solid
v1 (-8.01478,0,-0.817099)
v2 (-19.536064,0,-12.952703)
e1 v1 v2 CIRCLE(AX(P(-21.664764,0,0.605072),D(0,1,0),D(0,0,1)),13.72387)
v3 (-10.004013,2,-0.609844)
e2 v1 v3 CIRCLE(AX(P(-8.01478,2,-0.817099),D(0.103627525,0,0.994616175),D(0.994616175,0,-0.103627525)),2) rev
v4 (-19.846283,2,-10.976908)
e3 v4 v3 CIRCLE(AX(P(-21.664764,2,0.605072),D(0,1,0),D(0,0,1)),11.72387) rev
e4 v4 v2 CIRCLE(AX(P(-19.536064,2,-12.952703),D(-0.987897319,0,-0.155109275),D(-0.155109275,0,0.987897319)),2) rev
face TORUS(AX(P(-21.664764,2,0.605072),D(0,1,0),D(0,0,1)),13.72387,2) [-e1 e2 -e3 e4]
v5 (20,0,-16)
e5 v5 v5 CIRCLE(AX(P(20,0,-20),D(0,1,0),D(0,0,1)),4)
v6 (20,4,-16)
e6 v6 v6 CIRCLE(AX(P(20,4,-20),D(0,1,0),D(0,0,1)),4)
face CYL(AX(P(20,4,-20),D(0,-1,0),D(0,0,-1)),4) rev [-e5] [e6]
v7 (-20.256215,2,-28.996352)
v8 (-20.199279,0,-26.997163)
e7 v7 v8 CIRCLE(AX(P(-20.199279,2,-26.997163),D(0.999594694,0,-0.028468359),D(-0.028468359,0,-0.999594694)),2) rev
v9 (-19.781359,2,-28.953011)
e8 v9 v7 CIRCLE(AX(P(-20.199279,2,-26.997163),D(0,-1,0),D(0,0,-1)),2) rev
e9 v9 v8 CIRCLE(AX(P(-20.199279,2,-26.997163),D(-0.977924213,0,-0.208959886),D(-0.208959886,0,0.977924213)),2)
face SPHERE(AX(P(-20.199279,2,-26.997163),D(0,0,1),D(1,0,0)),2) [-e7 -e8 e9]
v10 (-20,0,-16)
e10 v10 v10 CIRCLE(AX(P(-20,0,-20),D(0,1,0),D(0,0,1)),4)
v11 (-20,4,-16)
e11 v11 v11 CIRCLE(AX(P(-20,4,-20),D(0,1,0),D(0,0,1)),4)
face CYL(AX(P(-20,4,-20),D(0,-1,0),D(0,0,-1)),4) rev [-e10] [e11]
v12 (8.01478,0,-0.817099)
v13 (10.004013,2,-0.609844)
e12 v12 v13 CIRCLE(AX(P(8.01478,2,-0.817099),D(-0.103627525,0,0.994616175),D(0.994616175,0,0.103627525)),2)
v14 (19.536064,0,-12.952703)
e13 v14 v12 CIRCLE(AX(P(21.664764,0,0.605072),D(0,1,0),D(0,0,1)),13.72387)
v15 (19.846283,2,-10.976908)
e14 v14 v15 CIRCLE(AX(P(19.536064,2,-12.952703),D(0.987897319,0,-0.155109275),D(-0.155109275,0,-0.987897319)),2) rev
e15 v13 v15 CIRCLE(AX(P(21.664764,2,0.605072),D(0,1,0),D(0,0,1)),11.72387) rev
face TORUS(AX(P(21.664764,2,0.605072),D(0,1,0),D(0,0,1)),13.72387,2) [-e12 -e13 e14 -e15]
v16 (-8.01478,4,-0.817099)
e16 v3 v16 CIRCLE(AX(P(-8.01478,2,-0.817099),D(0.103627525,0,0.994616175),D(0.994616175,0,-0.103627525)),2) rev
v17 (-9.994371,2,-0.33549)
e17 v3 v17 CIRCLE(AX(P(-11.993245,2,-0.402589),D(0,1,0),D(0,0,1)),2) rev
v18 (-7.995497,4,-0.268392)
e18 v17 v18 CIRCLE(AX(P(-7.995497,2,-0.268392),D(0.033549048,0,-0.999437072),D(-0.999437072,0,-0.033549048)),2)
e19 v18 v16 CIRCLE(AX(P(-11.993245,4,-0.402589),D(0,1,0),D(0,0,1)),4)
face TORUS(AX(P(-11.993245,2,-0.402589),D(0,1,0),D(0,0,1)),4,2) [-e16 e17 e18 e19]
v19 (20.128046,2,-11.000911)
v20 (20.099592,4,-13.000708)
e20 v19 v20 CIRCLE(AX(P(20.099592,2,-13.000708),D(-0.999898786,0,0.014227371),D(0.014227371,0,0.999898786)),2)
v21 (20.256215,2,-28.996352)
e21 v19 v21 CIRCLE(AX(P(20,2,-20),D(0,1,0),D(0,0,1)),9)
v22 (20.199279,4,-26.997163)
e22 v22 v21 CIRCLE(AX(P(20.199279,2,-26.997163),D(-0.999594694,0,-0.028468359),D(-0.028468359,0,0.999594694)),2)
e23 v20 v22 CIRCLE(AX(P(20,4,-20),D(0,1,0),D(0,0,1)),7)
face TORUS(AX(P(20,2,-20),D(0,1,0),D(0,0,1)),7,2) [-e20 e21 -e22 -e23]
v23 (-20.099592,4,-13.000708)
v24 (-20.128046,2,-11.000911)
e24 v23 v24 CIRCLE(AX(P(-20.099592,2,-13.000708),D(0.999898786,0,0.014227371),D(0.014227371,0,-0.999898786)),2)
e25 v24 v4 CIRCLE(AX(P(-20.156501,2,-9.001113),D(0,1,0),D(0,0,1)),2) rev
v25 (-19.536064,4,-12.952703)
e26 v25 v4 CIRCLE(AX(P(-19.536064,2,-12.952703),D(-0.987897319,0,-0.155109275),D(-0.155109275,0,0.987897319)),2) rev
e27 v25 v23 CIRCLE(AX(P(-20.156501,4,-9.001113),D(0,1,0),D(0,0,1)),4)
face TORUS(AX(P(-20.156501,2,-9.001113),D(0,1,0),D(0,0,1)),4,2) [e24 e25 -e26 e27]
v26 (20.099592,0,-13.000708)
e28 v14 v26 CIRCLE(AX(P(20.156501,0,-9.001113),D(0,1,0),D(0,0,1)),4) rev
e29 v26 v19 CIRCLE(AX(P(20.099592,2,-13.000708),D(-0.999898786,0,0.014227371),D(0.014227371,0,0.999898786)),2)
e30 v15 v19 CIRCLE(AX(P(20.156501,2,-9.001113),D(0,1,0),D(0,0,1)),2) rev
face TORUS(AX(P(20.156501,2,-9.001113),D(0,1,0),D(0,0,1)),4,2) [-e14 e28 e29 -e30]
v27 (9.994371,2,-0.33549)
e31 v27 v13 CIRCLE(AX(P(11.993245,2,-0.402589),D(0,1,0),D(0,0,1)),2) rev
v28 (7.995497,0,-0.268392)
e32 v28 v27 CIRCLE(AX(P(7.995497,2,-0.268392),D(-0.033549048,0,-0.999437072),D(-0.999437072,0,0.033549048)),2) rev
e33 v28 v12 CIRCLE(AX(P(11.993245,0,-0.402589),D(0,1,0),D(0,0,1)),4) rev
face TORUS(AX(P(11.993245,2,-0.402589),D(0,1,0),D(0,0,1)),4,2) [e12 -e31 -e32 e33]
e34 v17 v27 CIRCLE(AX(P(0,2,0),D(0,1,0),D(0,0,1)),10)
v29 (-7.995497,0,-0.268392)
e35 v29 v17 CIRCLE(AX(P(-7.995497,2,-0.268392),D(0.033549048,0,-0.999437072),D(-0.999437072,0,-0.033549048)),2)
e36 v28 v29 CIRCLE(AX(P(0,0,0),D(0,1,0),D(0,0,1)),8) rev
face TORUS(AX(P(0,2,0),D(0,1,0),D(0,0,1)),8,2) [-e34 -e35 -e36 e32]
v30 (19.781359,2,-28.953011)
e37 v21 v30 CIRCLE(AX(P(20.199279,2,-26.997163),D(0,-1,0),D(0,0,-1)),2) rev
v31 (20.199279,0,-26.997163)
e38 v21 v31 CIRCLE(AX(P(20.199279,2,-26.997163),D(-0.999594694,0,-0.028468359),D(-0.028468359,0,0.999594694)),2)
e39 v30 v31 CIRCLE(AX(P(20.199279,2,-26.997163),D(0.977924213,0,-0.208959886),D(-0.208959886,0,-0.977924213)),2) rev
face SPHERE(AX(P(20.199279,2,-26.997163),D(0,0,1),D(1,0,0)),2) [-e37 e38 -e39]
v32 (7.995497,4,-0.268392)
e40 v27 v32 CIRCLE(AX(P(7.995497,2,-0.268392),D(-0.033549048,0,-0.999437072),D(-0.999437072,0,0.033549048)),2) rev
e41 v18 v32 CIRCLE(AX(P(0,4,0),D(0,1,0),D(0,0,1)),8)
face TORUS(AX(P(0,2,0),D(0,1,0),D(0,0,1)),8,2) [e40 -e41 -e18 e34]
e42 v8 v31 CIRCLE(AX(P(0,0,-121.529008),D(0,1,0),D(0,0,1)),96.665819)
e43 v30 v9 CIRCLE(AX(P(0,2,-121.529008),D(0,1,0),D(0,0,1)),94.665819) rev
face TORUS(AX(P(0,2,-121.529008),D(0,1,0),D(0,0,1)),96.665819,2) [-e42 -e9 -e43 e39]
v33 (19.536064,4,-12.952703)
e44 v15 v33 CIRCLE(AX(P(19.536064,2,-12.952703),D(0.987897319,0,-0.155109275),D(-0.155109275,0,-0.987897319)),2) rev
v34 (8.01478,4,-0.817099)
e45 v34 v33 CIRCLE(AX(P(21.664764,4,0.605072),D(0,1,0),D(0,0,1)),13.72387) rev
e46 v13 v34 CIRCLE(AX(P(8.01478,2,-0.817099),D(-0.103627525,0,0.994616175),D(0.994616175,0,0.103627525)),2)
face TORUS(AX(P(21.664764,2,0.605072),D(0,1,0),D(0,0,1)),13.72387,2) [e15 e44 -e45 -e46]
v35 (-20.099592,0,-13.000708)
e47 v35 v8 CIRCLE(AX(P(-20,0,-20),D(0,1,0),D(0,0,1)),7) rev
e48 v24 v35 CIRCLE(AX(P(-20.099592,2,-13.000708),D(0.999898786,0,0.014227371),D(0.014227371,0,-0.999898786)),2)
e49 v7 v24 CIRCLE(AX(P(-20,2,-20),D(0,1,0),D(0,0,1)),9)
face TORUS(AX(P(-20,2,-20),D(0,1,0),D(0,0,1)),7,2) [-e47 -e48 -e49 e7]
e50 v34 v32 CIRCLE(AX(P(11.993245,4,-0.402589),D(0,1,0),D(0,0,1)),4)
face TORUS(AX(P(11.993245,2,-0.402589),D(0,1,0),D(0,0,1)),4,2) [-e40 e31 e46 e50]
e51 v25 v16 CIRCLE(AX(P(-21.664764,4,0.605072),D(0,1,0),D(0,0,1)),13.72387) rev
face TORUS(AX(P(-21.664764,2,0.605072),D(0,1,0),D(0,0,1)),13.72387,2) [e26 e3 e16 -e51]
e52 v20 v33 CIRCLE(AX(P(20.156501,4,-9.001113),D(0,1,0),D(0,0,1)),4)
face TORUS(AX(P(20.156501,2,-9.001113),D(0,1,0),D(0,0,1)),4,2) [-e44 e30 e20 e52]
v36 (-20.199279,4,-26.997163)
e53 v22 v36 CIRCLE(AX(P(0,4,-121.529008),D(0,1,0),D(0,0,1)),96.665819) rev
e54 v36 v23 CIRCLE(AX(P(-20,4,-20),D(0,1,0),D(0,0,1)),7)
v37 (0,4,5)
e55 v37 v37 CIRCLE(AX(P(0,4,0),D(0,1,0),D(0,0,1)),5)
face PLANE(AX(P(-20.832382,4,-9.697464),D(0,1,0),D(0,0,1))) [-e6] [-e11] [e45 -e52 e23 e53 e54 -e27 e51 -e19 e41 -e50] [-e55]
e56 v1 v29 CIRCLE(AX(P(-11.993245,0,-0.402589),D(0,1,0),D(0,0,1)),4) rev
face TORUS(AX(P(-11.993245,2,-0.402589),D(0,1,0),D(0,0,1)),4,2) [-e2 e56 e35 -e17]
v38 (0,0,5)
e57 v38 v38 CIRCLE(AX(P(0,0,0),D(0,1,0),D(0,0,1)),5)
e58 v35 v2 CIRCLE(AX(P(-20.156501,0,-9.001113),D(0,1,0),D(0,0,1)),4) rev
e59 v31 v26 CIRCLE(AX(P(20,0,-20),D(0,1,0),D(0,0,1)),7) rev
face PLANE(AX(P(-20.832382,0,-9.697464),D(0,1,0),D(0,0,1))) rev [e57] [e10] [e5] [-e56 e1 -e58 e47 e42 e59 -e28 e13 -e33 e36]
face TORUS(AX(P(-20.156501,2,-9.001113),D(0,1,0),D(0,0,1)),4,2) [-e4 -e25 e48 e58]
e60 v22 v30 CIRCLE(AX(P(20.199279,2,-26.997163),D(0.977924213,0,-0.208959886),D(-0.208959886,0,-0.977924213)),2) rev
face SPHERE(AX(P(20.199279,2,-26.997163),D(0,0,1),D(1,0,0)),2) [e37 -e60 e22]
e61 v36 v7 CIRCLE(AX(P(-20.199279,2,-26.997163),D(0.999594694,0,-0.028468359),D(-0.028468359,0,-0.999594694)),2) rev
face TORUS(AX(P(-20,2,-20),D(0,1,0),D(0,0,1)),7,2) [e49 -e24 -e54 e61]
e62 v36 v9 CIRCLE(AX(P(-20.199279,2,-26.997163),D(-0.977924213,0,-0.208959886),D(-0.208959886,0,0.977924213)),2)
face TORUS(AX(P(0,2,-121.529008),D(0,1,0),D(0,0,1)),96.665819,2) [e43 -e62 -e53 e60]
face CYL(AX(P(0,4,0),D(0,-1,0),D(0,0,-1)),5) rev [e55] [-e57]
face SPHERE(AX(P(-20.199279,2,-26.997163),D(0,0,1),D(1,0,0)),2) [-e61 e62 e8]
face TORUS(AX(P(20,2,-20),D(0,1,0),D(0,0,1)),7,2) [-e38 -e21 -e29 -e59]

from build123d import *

# Parameters (mm, degrees)
SKETCH1_R           = 5
SKETCH1_R_2         = 4
BOSS_EXTRUDE1_DEPTH = 4
FILLET1_R           = 2


with BuildPart() as part:
    # Sketch1 → Boss-Extrude1 (new body)
    with BuildSketch(Plane(origin=(0, 0, 0), x_dir=(1, 0, 0), z_dir=(0, 1, 0))):
        with BuildLine():
            ThreePointArc((-20, 29), (-29, 20), (-20, 11))
            ThreePointArc((-20, 11), (-13.164114328, 7.468842596), (-9.989400339, 0.460305187))
            ThreePointArc((-9.989400339, 0.460305187), (0, -10), (9.989400339, 0.460305187))
            ThreePointArc((9.989400339, 0.460305187), (13.164114328, 7.468842596), (20, 11))
            ThreePointArc((20, 11), (29, 20), (20, 29))
            ThreePointArc((20, 29), (0, 26.863188813), (-20, 29))
        make_face()
        with Locations(Location((0, 0, 0), (0, 0, 270))):
            Circle(SKETCH1_R, mode=Mode.SUBTRACT)
        with Locations(Location((-20, 20, 0), (0, 0, 270))):
            Circle(SKETCH1_R_2, mode=Mode.SUBTRACT)
        with Locations(Location((20, 20, 0), (0, 0, 270))):
            Circle(SKETCH1_R_2, mode=Mode.SUBTRACT)
    extrude(amount=BOSS_EXTRUDE1_DEPTH)

    # Fillet1
    fillet1_edges = [part.edges().sort_by_distance(p)[0] for p in [
        (13.164114328, 4, -7.468842596),
        (-20, 2, -11),
        (-20, 2, -29),
        (20, 2, -29),
        (20, 2, -11),
        (9.989400339, 2, -0.460305187),
        (-9.989400339, 2, -0.460305187),
        (29, 4, -20),
        (0, 4, -26.863188813),
        (-29, 4, -20),
        (-13.164114328, 4, -7.468842596),
        (-29, 0, -20),
        (0, 0, -26.863188813),
        (29, 0, -20),
        (0, 4, 10),
        (13.164114328, 0, -7.468842596),
        (0, 0, 10),
        (-13.164114328, 0, -7.468842596),
    ]]
    fillet(fillet1_edges, radius=FILLET1_R - 0.0001)  # a hair under: the kernel refuses the full size


solid = part.part
